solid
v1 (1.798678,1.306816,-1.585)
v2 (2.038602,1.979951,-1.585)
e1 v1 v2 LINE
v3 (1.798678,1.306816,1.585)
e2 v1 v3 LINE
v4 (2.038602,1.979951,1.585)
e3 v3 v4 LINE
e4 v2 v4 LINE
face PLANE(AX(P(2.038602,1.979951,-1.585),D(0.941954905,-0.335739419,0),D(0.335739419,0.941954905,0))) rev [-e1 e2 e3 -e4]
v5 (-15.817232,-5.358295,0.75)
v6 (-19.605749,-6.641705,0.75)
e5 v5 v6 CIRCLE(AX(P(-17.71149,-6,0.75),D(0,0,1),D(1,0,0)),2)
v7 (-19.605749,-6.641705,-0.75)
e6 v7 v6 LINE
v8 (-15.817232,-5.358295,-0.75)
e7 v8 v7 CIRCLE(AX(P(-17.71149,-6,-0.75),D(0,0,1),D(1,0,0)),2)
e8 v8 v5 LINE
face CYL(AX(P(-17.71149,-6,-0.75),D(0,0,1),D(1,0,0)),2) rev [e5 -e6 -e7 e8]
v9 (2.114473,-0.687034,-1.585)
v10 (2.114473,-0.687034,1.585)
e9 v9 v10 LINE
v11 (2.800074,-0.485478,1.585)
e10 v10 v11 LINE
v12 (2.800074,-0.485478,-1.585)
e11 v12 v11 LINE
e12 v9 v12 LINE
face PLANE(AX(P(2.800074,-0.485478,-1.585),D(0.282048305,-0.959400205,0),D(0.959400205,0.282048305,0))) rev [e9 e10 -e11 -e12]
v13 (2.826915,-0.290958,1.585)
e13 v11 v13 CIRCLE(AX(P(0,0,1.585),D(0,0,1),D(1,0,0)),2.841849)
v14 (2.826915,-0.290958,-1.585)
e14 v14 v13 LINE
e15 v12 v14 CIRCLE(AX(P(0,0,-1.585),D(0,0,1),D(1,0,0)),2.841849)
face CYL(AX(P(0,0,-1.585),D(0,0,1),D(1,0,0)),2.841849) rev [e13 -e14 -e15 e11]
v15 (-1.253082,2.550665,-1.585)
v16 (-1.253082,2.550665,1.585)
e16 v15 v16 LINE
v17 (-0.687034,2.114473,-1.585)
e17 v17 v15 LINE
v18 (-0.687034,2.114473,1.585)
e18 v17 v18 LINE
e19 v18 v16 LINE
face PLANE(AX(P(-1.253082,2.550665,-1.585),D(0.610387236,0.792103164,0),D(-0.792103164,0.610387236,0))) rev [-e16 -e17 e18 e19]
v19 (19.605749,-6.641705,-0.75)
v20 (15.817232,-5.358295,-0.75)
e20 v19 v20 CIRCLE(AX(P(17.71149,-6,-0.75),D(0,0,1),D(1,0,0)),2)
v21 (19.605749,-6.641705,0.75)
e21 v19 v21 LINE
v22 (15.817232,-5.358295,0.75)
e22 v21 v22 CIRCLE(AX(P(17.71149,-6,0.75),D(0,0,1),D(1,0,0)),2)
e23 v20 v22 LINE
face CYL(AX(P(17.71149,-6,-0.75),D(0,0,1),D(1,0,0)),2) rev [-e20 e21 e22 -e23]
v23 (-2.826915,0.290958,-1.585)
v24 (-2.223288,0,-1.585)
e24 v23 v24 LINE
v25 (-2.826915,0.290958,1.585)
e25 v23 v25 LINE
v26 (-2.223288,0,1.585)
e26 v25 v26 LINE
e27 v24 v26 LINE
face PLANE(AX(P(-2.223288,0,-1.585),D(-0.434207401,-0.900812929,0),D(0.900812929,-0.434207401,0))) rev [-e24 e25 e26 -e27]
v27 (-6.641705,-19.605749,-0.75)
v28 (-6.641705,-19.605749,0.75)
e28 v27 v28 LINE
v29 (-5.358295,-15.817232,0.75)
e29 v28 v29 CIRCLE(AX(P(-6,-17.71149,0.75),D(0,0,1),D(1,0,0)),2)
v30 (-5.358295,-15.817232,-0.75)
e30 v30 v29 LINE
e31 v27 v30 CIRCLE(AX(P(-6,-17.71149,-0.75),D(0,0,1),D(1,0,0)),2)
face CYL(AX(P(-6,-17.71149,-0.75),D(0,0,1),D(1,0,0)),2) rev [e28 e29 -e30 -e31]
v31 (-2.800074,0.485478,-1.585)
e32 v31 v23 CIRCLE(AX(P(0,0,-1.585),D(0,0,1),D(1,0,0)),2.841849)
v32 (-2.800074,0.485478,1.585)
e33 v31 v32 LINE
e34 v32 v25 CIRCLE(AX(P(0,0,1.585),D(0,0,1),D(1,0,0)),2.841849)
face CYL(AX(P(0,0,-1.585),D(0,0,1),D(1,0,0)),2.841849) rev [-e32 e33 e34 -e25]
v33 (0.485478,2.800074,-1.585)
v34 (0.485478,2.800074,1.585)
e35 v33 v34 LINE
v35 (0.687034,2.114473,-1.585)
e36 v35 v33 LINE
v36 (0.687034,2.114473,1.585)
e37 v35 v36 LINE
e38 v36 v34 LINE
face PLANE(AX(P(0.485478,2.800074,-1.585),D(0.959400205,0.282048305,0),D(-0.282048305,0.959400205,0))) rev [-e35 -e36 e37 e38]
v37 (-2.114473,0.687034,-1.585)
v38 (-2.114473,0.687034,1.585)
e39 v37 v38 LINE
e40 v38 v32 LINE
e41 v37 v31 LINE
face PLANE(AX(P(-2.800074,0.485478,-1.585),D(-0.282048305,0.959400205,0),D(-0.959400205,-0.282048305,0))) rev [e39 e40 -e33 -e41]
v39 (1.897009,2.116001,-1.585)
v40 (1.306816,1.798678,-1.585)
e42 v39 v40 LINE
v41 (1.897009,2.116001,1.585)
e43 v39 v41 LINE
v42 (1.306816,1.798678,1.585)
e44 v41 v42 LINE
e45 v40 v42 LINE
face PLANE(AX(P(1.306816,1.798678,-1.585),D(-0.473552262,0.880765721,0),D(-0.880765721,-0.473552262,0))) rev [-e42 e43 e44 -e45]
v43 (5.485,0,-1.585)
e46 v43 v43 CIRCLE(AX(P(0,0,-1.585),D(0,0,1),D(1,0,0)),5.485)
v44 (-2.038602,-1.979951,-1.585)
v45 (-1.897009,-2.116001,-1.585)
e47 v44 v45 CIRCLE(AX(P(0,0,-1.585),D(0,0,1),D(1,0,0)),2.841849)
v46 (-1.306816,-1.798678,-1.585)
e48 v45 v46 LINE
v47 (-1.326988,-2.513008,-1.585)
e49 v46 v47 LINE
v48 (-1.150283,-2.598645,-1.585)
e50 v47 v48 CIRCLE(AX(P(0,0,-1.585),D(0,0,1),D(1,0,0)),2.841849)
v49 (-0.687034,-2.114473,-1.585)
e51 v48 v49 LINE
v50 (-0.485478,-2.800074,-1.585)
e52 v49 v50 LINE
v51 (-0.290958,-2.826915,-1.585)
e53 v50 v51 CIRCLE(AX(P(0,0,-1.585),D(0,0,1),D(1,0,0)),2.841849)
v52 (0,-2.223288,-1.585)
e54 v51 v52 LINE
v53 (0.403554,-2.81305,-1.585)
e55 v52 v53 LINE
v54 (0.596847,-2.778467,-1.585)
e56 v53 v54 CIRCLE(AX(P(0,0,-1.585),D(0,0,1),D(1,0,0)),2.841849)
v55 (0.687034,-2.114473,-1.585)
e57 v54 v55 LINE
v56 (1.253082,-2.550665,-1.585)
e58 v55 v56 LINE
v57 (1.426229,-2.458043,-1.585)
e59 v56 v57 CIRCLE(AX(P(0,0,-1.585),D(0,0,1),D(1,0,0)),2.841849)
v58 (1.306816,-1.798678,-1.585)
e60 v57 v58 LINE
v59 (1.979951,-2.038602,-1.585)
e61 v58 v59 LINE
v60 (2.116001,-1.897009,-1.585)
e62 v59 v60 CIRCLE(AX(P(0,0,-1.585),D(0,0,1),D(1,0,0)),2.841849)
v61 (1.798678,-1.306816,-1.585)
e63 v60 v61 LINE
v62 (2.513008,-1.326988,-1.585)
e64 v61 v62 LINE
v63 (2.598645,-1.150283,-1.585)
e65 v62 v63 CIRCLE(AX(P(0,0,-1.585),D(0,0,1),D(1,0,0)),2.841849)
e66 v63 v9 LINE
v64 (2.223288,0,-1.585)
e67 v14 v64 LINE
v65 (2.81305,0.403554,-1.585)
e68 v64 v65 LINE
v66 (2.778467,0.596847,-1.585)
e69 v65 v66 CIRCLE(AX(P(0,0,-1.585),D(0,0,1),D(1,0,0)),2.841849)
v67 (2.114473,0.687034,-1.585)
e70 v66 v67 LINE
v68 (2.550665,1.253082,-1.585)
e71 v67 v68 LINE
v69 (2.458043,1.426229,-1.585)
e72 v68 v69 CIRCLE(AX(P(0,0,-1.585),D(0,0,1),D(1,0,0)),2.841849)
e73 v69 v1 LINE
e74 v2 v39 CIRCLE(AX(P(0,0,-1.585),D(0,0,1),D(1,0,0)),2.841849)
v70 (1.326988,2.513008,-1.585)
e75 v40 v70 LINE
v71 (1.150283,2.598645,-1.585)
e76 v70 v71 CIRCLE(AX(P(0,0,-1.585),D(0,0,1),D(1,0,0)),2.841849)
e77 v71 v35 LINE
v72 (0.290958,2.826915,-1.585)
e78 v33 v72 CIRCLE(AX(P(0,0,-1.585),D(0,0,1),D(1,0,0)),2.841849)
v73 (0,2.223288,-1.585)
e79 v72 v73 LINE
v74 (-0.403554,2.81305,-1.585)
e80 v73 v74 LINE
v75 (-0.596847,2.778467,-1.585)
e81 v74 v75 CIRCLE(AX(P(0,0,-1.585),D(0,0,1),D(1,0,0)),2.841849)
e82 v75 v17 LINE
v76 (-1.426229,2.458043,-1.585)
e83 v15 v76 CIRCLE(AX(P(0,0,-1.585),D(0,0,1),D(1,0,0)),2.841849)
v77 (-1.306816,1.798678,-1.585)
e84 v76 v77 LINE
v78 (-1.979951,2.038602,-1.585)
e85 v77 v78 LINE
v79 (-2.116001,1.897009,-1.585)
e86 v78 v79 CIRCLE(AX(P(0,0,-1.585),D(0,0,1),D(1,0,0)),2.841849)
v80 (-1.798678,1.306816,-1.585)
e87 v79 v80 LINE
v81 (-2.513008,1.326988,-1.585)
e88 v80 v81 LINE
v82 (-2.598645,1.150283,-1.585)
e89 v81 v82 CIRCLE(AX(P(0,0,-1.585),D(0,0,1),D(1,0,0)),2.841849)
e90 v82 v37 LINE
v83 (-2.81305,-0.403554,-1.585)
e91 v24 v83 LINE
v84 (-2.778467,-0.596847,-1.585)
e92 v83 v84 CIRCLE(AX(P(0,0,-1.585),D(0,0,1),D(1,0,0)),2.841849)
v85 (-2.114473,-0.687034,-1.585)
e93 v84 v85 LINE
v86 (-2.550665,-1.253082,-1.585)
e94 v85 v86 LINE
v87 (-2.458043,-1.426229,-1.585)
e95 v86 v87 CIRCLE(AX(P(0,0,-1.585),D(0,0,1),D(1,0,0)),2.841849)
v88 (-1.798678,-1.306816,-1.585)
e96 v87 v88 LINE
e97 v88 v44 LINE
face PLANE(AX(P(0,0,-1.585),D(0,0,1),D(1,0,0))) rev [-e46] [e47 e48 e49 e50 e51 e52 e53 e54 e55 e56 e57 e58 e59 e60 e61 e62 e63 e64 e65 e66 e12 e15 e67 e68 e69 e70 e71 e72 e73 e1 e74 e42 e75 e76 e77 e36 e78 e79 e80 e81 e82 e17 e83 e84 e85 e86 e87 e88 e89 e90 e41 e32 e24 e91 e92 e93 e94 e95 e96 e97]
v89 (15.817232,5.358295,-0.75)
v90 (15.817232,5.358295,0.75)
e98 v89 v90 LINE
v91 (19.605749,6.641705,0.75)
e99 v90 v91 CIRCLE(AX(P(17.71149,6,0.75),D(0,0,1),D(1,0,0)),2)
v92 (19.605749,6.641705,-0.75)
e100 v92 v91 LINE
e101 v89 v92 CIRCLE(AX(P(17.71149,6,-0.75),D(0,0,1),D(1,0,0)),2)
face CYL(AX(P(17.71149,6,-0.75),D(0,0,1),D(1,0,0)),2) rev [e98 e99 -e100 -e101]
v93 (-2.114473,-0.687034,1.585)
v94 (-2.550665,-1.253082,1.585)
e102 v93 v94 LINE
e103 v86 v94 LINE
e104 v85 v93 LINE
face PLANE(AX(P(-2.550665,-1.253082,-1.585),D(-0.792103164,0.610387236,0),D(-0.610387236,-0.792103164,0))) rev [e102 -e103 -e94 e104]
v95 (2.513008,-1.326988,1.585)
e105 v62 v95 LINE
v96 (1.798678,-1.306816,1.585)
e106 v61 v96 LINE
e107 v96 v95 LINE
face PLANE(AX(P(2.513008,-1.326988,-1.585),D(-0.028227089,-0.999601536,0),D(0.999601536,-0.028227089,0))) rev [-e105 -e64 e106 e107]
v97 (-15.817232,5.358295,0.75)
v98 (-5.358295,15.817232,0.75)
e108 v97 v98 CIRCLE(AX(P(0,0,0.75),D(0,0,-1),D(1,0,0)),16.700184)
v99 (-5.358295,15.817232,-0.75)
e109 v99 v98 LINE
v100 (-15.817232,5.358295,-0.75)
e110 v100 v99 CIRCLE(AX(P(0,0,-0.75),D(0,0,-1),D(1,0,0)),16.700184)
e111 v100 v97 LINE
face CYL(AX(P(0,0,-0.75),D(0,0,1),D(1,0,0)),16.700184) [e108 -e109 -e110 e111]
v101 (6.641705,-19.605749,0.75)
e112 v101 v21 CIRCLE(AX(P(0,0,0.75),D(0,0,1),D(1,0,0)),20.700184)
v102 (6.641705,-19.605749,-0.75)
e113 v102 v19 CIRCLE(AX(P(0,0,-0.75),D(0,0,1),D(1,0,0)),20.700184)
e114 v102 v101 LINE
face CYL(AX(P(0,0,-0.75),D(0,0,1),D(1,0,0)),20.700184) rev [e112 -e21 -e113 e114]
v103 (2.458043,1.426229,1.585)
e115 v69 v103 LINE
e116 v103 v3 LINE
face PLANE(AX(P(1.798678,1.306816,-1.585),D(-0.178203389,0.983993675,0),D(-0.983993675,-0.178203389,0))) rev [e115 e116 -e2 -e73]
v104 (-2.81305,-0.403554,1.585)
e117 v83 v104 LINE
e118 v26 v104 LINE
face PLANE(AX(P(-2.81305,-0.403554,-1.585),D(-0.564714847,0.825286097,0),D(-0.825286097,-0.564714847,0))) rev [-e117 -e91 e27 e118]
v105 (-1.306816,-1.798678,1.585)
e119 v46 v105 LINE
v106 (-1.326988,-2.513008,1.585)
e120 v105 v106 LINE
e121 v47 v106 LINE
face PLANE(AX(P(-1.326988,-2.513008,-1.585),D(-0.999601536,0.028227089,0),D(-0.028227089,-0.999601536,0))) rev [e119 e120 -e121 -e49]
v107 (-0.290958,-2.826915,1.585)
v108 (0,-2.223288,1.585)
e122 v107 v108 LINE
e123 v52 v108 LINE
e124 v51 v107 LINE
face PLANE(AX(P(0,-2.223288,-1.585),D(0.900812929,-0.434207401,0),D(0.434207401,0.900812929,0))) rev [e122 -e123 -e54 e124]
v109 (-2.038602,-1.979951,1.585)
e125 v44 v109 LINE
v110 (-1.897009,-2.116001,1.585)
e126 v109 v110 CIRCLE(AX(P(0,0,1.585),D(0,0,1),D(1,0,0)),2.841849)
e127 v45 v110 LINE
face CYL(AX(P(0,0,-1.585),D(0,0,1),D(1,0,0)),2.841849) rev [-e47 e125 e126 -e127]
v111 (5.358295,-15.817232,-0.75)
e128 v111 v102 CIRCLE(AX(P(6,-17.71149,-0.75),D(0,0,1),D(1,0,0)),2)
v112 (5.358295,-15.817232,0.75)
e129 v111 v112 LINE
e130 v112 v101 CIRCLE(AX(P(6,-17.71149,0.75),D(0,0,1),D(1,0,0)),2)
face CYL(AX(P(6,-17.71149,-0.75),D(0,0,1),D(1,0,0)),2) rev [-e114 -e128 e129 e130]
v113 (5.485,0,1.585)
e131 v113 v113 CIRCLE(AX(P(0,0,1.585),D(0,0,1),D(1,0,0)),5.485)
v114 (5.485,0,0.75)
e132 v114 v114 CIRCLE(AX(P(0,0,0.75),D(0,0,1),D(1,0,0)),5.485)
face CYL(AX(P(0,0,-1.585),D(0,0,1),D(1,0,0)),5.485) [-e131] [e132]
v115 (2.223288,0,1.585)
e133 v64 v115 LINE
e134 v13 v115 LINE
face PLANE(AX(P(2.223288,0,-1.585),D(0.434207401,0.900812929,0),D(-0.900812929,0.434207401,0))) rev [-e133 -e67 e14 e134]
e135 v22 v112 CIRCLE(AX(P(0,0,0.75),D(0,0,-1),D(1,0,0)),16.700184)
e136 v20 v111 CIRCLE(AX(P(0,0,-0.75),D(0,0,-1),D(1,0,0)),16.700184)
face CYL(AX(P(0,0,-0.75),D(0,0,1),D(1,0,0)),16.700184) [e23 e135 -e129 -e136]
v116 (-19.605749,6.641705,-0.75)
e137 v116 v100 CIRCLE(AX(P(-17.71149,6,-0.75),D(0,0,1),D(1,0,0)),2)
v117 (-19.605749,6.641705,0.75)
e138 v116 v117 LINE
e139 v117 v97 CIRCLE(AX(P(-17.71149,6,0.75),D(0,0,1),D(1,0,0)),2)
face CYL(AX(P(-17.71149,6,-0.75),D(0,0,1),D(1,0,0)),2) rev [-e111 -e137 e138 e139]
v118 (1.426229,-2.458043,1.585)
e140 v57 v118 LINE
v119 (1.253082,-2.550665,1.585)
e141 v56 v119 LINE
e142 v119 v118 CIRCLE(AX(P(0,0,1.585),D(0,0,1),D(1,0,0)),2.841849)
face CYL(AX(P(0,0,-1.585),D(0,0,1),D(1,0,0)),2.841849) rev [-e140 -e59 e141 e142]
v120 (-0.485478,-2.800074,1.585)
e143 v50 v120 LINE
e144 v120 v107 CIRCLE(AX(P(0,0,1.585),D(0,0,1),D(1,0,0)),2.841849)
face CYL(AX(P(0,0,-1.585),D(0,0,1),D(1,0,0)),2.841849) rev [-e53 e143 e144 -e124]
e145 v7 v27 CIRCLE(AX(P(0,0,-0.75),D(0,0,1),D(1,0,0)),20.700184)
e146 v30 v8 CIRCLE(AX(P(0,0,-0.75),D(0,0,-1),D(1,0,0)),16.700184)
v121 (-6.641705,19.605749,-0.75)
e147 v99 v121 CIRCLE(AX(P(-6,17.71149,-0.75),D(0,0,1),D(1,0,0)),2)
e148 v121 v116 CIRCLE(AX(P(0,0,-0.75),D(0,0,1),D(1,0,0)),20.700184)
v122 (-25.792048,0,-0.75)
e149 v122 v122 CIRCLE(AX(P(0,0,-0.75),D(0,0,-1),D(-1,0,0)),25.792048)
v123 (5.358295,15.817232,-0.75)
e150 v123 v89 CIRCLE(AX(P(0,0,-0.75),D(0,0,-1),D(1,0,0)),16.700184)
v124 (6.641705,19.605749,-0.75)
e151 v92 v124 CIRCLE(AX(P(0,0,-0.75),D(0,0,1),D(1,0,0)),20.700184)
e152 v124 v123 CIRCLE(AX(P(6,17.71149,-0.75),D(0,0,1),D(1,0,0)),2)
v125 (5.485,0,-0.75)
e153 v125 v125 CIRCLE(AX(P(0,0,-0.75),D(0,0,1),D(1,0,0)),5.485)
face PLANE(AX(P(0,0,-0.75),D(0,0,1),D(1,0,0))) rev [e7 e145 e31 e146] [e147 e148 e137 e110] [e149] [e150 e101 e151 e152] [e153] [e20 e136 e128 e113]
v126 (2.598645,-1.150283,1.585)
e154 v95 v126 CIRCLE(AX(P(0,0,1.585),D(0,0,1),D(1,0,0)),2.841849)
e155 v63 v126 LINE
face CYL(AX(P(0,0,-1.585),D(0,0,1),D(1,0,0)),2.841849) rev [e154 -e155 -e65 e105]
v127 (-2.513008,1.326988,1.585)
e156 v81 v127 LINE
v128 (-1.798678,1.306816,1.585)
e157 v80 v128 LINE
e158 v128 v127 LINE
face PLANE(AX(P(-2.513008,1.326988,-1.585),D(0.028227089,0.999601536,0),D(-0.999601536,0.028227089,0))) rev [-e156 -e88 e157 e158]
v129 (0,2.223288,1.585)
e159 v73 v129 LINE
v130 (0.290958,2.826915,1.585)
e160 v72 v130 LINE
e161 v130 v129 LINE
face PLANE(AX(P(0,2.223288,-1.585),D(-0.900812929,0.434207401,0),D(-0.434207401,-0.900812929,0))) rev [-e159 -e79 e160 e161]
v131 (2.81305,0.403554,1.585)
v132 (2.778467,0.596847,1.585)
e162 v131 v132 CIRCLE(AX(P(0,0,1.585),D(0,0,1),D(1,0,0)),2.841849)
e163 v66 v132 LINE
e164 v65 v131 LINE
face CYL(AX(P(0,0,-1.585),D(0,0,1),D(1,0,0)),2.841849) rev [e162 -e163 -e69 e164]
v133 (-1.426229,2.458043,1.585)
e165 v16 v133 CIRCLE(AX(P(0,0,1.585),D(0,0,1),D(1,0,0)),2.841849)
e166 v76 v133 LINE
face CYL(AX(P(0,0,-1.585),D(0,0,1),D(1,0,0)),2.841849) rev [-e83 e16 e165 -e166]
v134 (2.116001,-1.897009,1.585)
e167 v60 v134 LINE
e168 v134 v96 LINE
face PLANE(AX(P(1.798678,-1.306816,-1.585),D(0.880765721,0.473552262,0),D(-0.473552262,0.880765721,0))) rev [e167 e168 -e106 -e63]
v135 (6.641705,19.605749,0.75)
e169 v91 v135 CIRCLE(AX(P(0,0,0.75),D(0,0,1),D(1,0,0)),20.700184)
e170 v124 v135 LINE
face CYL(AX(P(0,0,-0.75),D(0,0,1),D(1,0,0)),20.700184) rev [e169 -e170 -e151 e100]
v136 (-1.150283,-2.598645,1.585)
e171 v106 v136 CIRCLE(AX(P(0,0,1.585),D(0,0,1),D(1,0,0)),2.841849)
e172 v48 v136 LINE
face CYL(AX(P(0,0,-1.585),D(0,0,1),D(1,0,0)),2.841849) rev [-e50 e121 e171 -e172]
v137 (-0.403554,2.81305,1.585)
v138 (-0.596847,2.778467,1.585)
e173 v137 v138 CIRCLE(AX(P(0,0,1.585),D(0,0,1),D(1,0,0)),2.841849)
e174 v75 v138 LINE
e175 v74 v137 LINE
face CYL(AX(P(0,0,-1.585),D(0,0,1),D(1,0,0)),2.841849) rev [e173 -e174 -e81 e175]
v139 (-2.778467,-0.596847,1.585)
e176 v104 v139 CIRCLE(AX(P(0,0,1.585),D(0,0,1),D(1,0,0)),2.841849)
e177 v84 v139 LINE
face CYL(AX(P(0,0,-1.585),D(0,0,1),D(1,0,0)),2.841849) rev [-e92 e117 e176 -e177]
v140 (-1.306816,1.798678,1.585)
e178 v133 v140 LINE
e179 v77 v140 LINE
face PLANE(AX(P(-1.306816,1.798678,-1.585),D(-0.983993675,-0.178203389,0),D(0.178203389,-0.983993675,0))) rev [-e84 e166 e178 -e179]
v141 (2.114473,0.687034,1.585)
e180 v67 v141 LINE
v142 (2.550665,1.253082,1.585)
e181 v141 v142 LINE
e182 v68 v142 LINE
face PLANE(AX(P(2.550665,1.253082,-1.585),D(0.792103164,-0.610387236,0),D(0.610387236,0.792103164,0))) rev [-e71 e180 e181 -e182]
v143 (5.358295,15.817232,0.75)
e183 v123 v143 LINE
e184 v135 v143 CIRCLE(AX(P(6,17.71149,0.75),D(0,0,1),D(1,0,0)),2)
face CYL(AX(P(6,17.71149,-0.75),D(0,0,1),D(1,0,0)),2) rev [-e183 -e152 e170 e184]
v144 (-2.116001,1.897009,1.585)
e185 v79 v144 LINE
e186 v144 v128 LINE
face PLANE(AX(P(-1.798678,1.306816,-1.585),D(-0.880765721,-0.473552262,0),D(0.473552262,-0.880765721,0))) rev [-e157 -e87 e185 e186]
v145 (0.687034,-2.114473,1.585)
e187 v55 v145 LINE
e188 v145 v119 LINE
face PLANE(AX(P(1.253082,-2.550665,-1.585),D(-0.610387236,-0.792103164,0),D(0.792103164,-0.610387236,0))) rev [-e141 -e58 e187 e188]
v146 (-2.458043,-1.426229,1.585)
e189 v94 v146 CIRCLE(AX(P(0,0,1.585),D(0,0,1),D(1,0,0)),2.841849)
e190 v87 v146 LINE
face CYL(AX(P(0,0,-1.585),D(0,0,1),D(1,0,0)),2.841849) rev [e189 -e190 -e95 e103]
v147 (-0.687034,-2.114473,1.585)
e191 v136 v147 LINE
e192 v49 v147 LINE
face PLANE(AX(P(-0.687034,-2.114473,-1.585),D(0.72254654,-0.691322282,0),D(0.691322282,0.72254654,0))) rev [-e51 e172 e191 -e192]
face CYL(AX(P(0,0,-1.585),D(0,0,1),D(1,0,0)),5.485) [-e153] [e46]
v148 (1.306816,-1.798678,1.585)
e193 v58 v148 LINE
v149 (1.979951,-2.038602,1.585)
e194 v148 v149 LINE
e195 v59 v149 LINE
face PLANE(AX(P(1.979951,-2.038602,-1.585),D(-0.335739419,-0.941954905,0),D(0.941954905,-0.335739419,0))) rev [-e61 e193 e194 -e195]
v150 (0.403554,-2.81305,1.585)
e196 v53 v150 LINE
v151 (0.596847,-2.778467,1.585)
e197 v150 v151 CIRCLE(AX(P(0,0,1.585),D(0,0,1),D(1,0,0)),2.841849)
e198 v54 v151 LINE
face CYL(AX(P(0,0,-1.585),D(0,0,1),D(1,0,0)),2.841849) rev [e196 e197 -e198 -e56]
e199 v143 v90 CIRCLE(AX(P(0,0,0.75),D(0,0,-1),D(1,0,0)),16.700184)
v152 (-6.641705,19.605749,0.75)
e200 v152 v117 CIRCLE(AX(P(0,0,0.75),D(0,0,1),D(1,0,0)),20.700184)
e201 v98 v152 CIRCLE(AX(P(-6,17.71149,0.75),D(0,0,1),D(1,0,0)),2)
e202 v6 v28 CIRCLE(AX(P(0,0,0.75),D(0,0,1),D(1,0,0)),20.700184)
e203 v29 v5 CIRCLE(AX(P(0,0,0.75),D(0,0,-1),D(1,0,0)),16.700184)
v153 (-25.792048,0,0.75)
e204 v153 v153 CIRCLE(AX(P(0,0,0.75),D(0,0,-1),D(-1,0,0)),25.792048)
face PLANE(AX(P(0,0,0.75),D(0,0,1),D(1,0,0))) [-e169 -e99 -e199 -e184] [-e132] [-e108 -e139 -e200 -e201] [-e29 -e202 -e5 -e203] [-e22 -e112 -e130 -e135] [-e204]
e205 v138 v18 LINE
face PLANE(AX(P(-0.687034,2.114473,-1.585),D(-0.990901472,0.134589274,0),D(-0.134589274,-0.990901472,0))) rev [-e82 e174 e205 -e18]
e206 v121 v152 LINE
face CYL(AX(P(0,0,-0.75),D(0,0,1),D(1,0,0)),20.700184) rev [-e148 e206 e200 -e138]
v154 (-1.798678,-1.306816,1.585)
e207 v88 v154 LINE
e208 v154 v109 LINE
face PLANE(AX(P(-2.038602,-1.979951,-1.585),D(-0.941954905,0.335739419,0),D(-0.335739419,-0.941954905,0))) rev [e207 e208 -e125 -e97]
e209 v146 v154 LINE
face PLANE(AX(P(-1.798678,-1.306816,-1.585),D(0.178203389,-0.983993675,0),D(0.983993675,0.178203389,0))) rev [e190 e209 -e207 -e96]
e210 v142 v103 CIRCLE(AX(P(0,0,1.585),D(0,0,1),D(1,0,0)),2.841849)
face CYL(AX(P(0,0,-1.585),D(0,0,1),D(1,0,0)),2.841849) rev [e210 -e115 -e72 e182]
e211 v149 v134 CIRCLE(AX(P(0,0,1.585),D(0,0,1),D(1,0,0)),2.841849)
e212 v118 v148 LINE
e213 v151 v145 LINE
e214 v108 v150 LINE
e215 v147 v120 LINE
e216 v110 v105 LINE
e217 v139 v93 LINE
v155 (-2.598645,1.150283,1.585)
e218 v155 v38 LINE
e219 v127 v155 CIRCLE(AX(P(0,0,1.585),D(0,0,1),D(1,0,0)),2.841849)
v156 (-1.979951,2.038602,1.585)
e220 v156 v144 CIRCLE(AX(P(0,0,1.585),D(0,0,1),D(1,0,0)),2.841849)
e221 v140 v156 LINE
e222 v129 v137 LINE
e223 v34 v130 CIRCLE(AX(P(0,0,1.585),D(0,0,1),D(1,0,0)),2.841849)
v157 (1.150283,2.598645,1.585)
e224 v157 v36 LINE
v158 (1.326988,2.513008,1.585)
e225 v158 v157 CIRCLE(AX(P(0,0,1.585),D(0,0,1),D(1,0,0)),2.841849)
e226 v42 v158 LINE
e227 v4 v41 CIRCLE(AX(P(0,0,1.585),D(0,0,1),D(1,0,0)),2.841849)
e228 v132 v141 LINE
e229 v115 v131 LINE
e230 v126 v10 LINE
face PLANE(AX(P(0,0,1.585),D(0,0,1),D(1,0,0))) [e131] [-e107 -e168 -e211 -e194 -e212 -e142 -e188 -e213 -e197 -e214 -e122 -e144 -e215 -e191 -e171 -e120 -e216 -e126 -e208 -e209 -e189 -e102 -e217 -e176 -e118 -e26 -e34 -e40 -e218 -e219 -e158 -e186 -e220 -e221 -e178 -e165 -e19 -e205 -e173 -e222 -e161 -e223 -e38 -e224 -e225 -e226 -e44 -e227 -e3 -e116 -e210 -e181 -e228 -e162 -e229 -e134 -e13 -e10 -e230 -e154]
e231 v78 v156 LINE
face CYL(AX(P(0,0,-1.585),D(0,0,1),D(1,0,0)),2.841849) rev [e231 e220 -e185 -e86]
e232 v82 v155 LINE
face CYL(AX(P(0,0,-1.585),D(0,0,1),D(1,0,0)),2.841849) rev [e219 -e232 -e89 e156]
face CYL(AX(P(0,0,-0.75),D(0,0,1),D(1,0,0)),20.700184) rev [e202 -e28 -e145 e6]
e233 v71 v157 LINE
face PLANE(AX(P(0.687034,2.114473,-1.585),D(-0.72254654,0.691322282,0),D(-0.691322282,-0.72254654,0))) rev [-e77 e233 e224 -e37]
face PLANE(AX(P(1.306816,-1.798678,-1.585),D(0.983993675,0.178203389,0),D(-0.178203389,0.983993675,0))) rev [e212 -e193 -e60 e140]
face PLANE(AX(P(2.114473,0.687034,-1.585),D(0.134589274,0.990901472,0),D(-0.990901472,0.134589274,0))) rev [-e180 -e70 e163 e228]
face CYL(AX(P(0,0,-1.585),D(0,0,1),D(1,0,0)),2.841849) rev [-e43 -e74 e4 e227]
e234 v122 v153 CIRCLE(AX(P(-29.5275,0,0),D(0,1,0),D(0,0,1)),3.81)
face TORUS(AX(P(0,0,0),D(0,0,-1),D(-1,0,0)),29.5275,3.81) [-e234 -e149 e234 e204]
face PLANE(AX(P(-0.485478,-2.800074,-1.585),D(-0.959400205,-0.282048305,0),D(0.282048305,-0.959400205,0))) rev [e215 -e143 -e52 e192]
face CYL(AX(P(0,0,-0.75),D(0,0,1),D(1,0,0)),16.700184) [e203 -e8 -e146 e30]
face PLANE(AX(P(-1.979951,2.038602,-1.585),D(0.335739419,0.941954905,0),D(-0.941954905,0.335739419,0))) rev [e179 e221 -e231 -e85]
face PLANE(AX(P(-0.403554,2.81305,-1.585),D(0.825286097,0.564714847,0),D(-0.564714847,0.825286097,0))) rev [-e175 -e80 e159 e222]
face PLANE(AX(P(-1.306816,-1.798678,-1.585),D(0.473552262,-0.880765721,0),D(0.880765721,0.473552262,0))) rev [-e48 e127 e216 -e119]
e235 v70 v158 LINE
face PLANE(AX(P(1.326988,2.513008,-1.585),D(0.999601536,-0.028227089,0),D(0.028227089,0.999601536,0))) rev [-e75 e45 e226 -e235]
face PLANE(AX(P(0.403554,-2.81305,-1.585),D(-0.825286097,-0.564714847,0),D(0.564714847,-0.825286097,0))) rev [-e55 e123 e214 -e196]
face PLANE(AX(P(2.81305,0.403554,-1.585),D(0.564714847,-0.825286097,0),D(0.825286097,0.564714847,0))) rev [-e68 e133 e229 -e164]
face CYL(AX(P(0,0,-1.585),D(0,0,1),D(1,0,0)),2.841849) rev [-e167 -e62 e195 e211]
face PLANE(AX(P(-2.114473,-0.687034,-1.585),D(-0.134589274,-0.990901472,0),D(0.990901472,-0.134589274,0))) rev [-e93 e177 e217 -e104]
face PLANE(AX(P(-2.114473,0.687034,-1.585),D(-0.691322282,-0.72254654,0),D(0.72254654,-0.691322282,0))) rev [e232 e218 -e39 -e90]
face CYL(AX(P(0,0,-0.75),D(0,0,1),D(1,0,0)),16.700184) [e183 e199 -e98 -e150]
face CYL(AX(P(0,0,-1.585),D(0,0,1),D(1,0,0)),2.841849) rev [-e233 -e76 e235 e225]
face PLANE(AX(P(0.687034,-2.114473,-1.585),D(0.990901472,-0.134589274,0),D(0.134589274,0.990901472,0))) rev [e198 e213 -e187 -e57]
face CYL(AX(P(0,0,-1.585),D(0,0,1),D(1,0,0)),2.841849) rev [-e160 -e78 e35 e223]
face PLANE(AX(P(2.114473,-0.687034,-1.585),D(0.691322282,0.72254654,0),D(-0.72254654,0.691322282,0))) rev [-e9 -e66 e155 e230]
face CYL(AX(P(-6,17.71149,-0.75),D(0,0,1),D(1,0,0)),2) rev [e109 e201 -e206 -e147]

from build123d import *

# Parameters (mm, degrees)
SKETCH2_R                = 3.81
BOSS_EXTRUDE1_DEPTH      = 1.585
BOSS_EXTRUDE1_DEPTH_BACK = 1.585
SKETCH4_R                = 5.485
BOSS_EXTRUDE2_DEPTH      = 0.75
BOSS_EXTRUDE2_DEPTH_BACK = 0.75
SKETCH5_R                = 26.708345462
SKETCH5_R_2              = 4.443835797


with BuildPart() as part:
    # Sweep1: sweep along a path in Sketch1
    with BuildLine(Plane.XY) as sweep1_path:
        CenterArc((0, 0), 29.5275, 0, 360)
    # Sketch2 → Sweep1 (sweep)
    with BuildSketch(Plane(origin=(0, 0, 0), x_dir=(1, 0, 0), z_dir=(0, 1, 0))):
        with Locations((-29.5275, 0)):
            Circle(SKETCH2_R)
    sweep(path=sweep1_path.line)


with BuildPart() as body_2:
    # Sketch4 → Boss-Extrude1 (new, two sides: drawn at the far end of the back side and taken through both)
    with BuildSketch(Plane.XY.offset(-BOSS_EXTRUDE1_DEPTH_BACK)):
        with Locations((9.906, -10.287)):
            Circle(SKETCH4_R)
        with BuildLine():
            Line((9.502446481, -7.47395), (9.906, -8.063711559))
            Line((9.906, -8.063711559), (10.196958476, -7.460084913))
            ThreePointArc((10.196958476, -7.460084913), (10.294450159, -7.471824656), (10.391478053, -7.486925571))
            Line((10.391478053, -7.486925571), (10.593033912, -8.172527041))
            Line((10.593033912, -8.172527041), (11.056282758, -7.688355099))
            ThreePointArc((11.056282758, -7.688355099), (11.145375078, -7.729646845), (11.232987649, -7.773991937))
            Line((11.232987649, -7.773991937), (11.212816157, -8.488321868))
            Line((11.212816157, -8.488321868), (11.803009349, -8.170998754))
            ThreePointArc((11.803009349, -8.170998754), (11.87498133, -8.237800579), (11.944602449, -8.307049041))
            Line((11.944602449, -8.307049041), (11.704678132, -8.980183843))
            Line((11.704678132, -8.980183843), (12.364043448, -8.860771354))
            ThreePointArc((12.364043448, -8.860771354), (12.41184997, -8.94654423), (12.456664638, -9.03391754))
            Line((12.456664638, -9.03391754), (12.020472959, -9.599966088))
            Line((12.020472959, -9.599966088), (12.684467128, -9.690153151))
            ThreePointArc((12.684467128, -9.690153151), (12.703428556, -9.786501031), (12.71905, -9.883446481))
            Line((12.71905, -9.883446481), (12.129288441, -10.287))
            Line((12.129288441, -10.287), (12.732915087, -10.577958476))
            ThreePointArc((12.732915087, -10.577958476), (12.721175344, -10.675450159), (12.706074429, -10.772478053))
            Line((12.706074429, -10.772478053), (12.020472959, -10.974033912))
            Line((12.020472959, -10.974033912), (12.504644901, -11.437282758))
            ThreePointArc((12.504644901, -11.437282758), (12.463353155, -11.526375078), (12.419008063, -11.613987649))
            Line((12.419008063, -11.613987649), (11.704678132, -11.593816157))
            Line((11.704678132, -11.593816157), (12.022001246, -12.184009349))
            ThreePointArc((12.022001246, -12.184009349), (11.955199421, -12.25598133), (11.885950959, -12.325602449))
            Line((11.885950959, -12.325602449), (11.212816157, -12.085678132))
            Line((11.212816157, -12.085678132), (11.332228646, -12.745043448))
            ThreePointArc((11.332228646, -12.745043448), (11.24645577, -12.79284997), (11.15908246, -12.837664638))
            Line((11.15908246, -12.837664638), (10.593033912, -12.401472959))
            Line((10.593033912, -12.401472959), (10.502846849, -13.065467128))
            ThreePointArc((10.502846849, -13.065467128), (10.406498969, -13.084428556), (10.309553519, -13.10005))
            Line((10.309553519, -13.10005), (9.906, -12.510288441))
            Line((9.906, -12.510288441), (9.615041524, -13.113915087))
            ThreePointArc((9.615041524, -13.113915087), (9.517549841, -13.102175344), (9.420521947, -13.087074429))
            Line((9.420521947, -13.087074429), (9.218966088, -12.401472959))
            Line((9.218966088, -12.401472959), (8.755717242, -12.885644901))
            ThreePointArc((8.755717242, -12.885644901), (8.666624922, -12.844353155), (8.579012351, -12.800008063))
            Line((8.579012351, -12.800008063), (8.599183843, -12.085678132))
            Line((8.599183843, -12.085678132), (8.008990651, -12.403001246))
            ThreePointArc((8.008990651, -12.403001246), (7.93701867, -12.336199421), (7.867397551, -12.266950959))
            Line((7.867397551, -12.266950959), (8.107321868, -11.593816157))
            Line((8.107321868, -11.593816157), (7.447956552, -11.713228646))
            ThreePointArc((7.447956552, -11.713228646), (7.40015003, -11.62745577), (7.355335362, -11.54008246))
            Line((7.355335362, -11.54008246), (7.791527041, -10.974033912))
            Line((7.791527041, -10.974033912), (7.127532872, -10.883846849))
            ThreePointArc((7.127532872, -10.883846849), (7.108571444, -10.787498969), (7.09295, -10.690553519))
            Line((7.09295, -10.690553519), (7.682711559, -10.287))
            Line((7.682711559, -10.287), (7.079084913, -9.996041524))
            ThreePointArc((7.079084913, -9.996041524), (7.090824656, -9.898549841), (7.105925571, -9.801521947))
            Line((7.105925571, -9.801521947), (7.791527041, -9.599966088))
            Line((7.791527041, -9.599966088), (7.307355099, -9.136717242))
            ThreePointArc((7.307355099, -9.136717242), (7.348646845, -9.047624922), (7.392991937, -8.960012351))
            Line((7.392991937, -8.960012351), (8.107321868, -8.980183843))
            Line((8.107321868, -8.980183843), (7.789998754, -8.389990651))
            ThreePointArc((7.789998754, -8.389990651), (7.856800579, -8.31801867), (7.926049041, -8.248397551))
            Line((7.926049041, -8.248397551), (8.599183843, -8.488321868))
            Line((8.599183843, -8.488321868), (8.479771354, -7.828956552))
            ThreePointArc((8.479771354, -7.828956552), (8.56554423, -7.78115003), (8.65291754, -7.736335362))
            Line((8.65291754, -7.736335362), (9.218966088, -8.172527041))
            Line((9.218966088, -8.172527041), (9.309153151, -7.508532872))
            ThreePointArc((9.309153151, -7.508532872), (9.405501031, -7.489571444), (9.502446481, -7.47395))
        make_face(mode=Mode.SUBTRACT)
    extrude(amount=BOSS_EXTRUDE1_DEPTH + BOSS_EXTRUDE1_DEPTH_BACK)


with BuildPart() as body_3:
    # Sketch5 → Boss-Extrude2 (new, two sides: drawn at the far end of the back side and taken through both)
    with BuildSketch(Plane.XY.offset(-BOSS_EXTRUDE2_DEPTH_BACK)):
        Circle(SKETCH5_R)
        Circle(SKETCH5_R_2, mode=Mode.SUBTRACT)
        with BuildLine():
            ThreePointArc((19.605748825, 6.641704905), (14.637240707, 14.637240707), (6.641704905, 19.605748825))
            ThreePointArc((6.641704905, 19.605748825), (4.105741619, 18.353195349), (5.358295095, 15.817232063))
            ThreePointArc((5.358295095, 15.817232063), (11.808813583, 11.808813583), (15.817232063, 5.358295095))
            ThreePointArc((15.817232063, 5.358295095), (18.353195349, 4.105741619), (19.605748825, 6.641704905))
        make_face(mode=Mode.SUBTRACT)
        with BuildLine():
            ThreePointArc((-6.641704905, 19.605748825), (-14.637240707, 14.637240707), (-19.605748825, 6.641704905))
            ThreePointArc((-19.605748825, 6.641704905), (-18.353195349, 4.105741619), (-15.817232063, 5.358295095))
            ThreePointArc((-15.817232063, 5.358295095), (-11.808813583, 11.808813583), (-5.358295095, 15.817232063))
            ThreePointArc((-5.358295095, 15.817232063), (-4.105741619, 18.353195349), (-6.641704905, 19.605748825))
        make_face(mode=Mode.SUBTRACT)
        with BuildLine():
            ThreePointArc((6.641704905, -19.605748825), (14.637240707, -14.637240707), (19.605748825, -6.641704905))
            ThreePointArc((19.605748825, -6.641704905), (18.353195349, -4.105741619), (15.817232063, -5.358295095))
            ThreePointArc((15.817232063, -5.358295095), (11.808813583, -11.808813583), (5.358295095, -15.817232063))
            ThreePointArc((5.358295095, -15.817232063), (4.105741619, -18.353195349), (6.641704905, -19.605748825))
        make_face(mode=Mode.SUBTRACT)
        with BuildLine():
            ThreePointArc((-19.605748825, -6.641704905), (-14.637240707, -14.637240707), (-6.641704905, -19.605748825))
            ThreePointArc((-6.641704905, -19.605748825), (-4.105741619, -18.353195349), (-5.358295095, -15.817232063))
            ThreePointArc((-5.358295095, -15.817232063), (-11.808813583, -11.808813583), (-15.817232063, -5.358295095))
            ThreePointArc((-15.817232063, -5.358295095), (-18.353195349, -4.105741619), (-19.605748825, -6.641704905))
        make_face(mode=Mode.SUBTRACT)
    extrude(amount=BOSS_EXTRUDE2_DEPTH + BOSS_EXTRUDE2_DEPTH_BACK)


with BuildPart() as body_2_1:
    # Body-Move/Copy1: read off the stored shape, not the designer's step
    # Body-Move/Copy1: moved
    add(body_2.part.moved(Location((-9.906, 10.287, 0))))


with BuildPart() as body_3_1:
    add(body_3.part)

    # Combine3: union body 2, part
    add(body_2_1.part)
    add(part.part)


solid = body_3_1.part
